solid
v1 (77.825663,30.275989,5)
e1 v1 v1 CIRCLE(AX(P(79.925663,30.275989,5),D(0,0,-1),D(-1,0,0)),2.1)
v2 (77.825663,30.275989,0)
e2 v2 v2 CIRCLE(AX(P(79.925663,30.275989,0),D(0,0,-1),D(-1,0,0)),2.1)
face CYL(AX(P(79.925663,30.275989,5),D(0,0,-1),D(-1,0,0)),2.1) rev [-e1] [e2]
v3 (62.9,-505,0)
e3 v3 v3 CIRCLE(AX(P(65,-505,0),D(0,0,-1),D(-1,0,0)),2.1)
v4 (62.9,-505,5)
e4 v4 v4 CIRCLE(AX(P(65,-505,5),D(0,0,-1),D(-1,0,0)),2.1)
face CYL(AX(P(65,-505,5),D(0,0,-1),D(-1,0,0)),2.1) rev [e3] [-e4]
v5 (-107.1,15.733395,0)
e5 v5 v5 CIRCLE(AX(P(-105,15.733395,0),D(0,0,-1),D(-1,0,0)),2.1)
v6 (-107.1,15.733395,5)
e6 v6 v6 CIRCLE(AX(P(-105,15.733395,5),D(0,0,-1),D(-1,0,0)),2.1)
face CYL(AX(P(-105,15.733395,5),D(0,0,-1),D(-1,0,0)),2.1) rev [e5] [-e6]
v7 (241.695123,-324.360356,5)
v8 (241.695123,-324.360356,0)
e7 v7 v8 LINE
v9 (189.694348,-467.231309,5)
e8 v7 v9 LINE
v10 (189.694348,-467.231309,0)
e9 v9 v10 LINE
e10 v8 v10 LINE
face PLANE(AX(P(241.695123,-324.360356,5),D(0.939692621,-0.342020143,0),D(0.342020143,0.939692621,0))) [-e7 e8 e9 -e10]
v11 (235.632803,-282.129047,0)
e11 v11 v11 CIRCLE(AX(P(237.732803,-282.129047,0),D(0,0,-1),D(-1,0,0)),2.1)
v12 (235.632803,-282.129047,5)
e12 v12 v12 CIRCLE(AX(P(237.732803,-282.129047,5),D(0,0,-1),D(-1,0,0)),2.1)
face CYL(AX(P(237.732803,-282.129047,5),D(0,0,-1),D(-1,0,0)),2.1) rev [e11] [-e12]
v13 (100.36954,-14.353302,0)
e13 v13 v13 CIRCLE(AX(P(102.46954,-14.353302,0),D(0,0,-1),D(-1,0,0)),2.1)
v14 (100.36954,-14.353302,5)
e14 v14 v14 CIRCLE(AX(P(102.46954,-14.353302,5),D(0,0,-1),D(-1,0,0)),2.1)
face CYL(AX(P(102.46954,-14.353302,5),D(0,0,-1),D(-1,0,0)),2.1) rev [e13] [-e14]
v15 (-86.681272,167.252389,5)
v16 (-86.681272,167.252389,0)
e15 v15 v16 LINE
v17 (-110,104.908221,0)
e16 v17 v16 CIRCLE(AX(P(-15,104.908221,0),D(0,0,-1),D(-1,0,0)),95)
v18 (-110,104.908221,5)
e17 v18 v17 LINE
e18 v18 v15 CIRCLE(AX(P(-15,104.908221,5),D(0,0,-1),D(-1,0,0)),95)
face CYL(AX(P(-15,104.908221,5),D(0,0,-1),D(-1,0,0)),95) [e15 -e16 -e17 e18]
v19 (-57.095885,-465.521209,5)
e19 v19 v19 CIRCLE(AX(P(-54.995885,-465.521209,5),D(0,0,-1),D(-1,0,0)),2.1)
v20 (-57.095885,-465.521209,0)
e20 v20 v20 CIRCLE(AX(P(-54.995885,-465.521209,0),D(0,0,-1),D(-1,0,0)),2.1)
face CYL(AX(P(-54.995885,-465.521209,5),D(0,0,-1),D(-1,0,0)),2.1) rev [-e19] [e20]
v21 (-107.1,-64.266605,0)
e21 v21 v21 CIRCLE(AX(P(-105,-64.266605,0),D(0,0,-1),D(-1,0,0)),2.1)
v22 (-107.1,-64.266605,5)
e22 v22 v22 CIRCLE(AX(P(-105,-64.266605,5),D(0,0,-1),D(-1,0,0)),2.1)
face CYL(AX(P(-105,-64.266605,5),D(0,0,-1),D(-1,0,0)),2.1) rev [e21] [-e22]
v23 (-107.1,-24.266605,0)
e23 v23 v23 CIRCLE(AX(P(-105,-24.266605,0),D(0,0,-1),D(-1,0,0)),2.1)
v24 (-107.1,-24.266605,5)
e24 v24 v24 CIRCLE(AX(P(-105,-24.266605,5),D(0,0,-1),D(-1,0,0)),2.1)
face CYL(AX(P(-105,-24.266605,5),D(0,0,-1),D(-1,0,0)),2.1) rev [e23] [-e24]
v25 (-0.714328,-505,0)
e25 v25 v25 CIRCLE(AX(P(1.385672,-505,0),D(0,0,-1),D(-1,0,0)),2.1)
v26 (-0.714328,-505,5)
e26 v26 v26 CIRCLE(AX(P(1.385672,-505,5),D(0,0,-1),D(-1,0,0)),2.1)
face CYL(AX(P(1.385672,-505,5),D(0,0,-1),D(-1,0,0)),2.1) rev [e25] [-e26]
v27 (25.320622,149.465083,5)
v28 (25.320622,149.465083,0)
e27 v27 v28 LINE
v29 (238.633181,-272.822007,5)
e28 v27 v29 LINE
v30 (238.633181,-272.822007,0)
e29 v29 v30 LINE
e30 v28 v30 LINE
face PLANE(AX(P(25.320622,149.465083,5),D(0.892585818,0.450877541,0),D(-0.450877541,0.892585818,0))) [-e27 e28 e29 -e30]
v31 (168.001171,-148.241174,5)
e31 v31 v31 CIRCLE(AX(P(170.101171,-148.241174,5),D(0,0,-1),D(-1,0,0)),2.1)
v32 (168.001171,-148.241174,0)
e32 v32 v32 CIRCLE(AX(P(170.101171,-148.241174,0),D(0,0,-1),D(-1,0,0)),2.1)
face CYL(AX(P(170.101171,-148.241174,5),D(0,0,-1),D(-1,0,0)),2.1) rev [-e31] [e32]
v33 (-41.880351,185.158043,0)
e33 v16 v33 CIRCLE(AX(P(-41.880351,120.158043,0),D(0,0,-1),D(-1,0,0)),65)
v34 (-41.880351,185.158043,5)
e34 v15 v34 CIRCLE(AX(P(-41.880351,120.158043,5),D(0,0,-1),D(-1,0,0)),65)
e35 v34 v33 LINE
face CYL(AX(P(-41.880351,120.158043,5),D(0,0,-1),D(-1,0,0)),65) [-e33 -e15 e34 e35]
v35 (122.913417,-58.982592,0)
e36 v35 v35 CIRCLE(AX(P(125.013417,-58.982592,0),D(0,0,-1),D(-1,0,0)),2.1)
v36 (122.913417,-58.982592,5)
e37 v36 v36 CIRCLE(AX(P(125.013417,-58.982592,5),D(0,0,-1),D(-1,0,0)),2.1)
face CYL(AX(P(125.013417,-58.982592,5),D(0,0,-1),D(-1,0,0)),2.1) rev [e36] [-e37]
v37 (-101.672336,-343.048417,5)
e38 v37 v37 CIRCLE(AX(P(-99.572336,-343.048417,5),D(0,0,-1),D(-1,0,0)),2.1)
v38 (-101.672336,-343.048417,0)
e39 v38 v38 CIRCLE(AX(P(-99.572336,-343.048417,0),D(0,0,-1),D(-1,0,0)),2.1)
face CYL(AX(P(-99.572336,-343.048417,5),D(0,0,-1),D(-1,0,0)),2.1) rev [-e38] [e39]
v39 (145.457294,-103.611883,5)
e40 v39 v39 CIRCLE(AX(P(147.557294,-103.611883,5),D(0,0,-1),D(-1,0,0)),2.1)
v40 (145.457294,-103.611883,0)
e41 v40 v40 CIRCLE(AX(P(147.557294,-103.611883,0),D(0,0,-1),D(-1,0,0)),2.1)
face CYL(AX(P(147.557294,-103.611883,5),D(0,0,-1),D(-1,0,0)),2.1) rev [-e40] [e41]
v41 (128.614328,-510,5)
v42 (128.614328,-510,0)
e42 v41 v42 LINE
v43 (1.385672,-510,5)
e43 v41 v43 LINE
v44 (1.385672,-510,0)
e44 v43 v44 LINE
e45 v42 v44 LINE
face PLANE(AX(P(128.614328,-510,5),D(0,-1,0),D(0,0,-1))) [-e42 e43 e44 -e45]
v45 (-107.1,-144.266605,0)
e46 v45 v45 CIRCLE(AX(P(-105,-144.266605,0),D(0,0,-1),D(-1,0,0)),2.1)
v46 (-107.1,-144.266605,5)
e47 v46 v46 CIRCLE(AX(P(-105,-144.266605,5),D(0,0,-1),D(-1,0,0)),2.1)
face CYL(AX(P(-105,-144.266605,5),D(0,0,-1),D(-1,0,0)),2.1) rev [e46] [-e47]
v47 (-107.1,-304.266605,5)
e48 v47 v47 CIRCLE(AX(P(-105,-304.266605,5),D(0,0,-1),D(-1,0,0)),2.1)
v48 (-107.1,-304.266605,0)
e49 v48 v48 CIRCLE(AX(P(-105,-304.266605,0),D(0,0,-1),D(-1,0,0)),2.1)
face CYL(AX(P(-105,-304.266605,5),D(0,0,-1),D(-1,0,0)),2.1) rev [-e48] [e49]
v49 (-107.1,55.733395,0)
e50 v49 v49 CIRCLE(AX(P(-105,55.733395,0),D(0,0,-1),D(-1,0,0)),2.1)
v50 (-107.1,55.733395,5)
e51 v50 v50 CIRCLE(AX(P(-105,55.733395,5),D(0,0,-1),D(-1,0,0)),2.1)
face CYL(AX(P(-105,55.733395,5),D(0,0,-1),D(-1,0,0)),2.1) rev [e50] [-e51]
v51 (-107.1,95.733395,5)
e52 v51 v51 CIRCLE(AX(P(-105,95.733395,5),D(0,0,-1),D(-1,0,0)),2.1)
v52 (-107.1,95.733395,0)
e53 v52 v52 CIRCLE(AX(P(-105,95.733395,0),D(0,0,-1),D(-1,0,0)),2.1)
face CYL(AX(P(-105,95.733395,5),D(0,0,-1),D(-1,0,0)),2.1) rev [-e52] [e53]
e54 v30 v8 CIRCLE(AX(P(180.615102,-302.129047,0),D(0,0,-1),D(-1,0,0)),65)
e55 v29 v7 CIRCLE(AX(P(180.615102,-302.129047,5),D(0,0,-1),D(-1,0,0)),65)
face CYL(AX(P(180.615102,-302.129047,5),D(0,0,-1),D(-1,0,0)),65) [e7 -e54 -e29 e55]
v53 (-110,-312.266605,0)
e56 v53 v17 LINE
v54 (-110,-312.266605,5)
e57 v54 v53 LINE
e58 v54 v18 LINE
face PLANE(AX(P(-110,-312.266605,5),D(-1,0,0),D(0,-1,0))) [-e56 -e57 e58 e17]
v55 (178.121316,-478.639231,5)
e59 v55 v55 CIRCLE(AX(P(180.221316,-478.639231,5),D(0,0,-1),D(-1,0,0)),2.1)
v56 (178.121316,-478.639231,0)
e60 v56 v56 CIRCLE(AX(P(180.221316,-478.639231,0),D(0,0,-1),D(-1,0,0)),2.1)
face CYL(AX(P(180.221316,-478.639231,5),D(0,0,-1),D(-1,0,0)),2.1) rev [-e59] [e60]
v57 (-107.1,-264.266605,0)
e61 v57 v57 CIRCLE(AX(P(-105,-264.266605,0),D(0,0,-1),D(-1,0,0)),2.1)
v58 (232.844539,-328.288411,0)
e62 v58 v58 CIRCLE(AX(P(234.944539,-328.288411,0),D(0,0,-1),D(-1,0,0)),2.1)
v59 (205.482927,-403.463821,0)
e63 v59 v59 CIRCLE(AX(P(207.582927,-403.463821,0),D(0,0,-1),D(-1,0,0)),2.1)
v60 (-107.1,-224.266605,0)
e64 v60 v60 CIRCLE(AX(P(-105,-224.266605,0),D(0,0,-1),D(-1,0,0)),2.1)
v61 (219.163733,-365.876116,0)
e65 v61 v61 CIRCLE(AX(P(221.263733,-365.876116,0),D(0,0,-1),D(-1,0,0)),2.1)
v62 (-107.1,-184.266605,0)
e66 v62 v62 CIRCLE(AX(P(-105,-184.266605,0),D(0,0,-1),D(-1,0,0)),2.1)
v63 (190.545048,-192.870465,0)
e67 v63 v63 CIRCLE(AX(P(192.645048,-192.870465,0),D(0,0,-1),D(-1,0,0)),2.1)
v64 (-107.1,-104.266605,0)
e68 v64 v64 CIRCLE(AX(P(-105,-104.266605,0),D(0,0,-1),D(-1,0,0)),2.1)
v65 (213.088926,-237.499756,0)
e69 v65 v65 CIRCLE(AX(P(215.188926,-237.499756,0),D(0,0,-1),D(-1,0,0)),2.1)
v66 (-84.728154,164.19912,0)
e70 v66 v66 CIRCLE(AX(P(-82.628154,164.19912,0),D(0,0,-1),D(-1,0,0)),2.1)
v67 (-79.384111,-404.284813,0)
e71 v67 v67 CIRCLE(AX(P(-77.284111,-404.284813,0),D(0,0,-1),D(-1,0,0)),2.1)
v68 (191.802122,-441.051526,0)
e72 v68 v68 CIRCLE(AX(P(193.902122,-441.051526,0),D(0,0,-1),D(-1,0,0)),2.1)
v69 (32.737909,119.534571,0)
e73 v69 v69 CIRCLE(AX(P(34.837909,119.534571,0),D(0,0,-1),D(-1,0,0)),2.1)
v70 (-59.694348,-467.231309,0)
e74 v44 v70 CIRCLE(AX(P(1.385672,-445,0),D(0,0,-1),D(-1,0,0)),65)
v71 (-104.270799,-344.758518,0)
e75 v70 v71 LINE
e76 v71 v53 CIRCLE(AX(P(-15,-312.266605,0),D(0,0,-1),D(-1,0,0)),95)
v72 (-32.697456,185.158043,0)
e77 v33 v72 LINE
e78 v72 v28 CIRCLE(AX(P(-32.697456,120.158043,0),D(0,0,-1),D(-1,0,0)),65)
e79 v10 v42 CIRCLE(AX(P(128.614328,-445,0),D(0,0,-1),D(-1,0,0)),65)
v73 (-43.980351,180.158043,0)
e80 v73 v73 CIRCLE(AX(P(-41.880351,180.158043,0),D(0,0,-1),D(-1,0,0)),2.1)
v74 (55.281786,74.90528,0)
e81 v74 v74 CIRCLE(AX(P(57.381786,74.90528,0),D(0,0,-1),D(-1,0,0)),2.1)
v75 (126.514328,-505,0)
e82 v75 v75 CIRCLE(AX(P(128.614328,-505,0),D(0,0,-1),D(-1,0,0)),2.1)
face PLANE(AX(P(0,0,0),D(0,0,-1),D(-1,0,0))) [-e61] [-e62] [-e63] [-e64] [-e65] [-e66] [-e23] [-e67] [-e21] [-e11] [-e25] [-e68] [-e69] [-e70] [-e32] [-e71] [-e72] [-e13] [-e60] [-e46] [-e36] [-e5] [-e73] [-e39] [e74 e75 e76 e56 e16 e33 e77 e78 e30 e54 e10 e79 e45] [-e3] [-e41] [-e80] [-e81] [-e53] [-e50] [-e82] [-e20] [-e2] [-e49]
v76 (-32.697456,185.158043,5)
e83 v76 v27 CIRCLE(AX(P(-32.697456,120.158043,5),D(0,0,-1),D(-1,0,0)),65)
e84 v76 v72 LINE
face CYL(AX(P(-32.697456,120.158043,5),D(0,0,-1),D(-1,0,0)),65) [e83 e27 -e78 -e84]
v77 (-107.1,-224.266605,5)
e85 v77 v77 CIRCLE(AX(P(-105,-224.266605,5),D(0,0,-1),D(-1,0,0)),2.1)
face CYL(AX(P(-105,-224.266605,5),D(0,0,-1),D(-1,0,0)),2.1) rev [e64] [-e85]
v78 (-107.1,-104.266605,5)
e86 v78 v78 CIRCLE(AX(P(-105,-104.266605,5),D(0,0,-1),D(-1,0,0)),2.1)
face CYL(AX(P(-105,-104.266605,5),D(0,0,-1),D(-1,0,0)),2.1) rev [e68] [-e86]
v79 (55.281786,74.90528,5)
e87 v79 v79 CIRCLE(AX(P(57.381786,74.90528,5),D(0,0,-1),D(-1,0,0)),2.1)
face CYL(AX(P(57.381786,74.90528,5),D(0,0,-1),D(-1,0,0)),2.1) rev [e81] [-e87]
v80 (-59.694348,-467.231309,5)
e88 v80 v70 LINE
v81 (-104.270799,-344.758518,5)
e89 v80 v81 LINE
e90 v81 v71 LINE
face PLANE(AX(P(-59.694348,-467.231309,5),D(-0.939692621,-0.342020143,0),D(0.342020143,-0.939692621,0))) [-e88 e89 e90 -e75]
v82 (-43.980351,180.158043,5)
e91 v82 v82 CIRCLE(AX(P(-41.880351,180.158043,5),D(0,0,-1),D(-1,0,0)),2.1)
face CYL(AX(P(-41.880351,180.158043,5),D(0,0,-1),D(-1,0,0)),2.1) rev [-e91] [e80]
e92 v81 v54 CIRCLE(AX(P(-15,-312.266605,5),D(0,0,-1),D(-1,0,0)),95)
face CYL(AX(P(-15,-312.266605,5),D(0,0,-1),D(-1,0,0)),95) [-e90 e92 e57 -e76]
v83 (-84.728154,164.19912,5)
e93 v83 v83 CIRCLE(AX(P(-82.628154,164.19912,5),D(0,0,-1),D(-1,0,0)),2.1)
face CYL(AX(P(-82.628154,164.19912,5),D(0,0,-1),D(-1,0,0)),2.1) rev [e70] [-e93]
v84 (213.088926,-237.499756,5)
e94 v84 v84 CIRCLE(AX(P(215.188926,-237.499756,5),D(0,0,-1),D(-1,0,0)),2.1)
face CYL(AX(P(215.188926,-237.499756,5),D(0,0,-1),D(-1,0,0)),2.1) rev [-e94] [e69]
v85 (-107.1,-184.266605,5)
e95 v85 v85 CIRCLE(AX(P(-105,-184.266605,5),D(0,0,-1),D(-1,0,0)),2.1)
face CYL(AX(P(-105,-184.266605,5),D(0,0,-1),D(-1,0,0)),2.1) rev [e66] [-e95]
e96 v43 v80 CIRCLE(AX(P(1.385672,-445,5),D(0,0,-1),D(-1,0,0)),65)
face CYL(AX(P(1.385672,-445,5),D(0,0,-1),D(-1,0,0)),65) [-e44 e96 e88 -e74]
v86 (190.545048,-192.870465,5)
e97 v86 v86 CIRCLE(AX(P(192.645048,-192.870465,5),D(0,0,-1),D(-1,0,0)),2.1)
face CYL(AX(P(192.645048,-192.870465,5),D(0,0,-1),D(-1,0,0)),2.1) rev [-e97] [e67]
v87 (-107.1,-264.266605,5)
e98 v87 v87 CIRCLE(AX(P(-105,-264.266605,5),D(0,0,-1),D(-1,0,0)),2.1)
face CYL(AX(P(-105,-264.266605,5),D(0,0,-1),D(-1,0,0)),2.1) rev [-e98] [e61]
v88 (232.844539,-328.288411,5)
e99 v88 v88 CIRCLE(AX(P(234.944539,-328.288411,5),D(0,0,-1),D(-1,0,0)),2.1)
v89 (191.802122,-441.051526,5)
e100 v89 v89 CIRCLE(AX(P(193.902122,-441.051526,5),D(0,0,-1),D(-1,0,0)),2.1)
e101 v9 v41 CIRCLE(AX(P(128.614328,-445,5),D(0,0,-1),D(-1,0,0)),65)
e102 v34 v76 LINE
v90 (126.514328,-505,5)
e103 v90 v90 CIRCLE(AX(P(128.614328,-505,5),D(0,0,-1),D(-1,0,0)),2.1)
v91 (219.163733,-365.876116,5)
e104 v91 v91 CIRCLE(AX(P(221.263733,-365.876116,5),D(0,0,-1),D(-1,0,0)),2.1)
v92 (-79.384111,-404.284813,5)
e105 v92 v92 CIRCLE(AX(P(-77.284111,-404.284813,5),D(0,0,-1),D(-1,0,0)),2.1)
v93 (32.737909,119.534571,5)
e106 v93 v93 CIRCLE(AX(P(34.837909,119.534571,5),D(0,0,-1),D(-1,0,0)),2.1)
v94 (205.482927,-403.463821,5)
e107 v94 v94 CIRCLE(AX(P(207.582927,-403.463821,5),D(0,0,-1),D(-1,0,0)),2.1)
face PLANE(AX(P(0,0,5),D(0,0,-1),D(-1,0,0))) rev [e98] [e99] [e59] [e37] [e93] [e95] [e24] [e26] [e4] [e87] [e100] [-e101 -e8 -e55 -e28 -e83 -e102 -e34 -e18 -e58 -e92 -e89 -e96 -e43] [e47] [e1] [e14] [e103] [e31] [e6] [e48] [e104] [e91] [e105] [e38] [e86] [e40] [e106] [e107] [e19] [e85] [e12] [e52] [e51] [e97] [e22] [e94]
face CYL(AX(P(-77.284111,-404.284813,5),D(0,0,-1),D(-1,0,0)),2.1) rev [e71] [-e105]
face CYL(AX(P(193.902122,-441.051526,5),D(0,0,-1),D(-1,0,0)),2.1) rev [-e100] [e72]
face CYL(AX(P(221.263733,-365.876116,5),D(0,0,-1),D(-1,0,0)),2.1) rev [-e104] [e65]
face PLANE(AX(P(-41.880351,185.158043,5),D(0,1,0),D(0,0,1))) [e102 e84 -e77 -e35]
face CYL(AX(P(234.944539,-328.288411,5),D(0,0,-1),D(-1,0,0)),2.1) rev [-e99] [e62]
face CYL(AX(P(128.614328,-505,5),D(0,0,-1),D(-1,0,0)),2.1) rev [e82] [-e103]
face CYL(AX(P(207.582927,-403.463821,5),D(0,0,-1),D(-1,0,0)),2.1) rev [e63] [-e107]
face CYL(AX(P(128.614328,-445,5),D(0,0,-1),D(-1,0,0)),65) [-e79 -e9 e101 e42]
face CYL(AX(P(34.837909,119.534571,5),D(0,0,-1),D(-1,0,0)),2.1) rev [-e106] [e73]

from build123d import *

# Parameters (mm, degrees)
SKETCH1_W           = 720
SKETCH1_H           = 1160
BOSS_EXTRUDE1_DEPTH = 5
FILLET1_R           = 10
CUT_EXTRUDE1_DEPTH  = 683.6602376
SKETCH3_W           = 360
SKETCH3_H           = 360
CUT_EXTRUDE2_DEPTH  = 683.6602376
FILLET2_R           = 100
BOSS_EXTRUDE2_DEPTH = 5
FILLET3_R           = 10
CUT_EXTRUDE5_DEPTH  = 691.712208801
FILLET6_R           = 50
FILLET7_R           = 50
BOSS_EXTRUDE3_DEPTH = 5
SKETCH10_W          = 50
SKETCH10_H          = 680
BOSS_EXTRUDE4_DEPTH = 5
BOSS_EXTRUDE5_DEPTH = 5
FILLET8_R           = 20
FILLET9_R           = 100
FILLET10_R          = 10
SKETCH12_R          = 2.1
CUT_EXTRUDE6_DEPTH  = 691.71220894
FILLET11_R          = 80
SKETCH13_R          = 3.1
CUT_EXTRUDE7_DEPTH  = 691.71220894
SKETCH14_R          = 2.1
CUT_EXTRUDE8_DEPTH  = 691.71220894
SKETCH15_R          = 2.1
CUT_EXTRUDE9_DEPTH  = 691.71220894
SKETCH16_R          = 2.1
CUT_EXTRUDE10_DEPTH = 691.71220894
SKETCH17_R          = 3.1
CUT_EXTRUDE11_DEPTH = 691.71220894
SKETCH18_R          = 2.1
CUT_EXTRUDE12_DEPTH = 691.71220894
CUT_EXTRUDE13_DEPTH = 691.71220894
BOSS_EXTRUDE6_START = -5
BOSS_EXTRUDE6_DEPTH = 5


with BuildPart() as part:
    # Sketch1 → Boss-Extrude1 (new body)
    with BuildSketch(Plane.XY):
        Rectangle(SKETCH1_W, SKETCH1_H)
    extrude(amount=BOSS_EXTRUDE1_DEPTH)

    # Fillet1
    fillet1_edges = [part.edges().sort_by_distance(p)[0] for p in [
        (360, -580, 2.5),
        (-360, -580, 2.5),
        (-360, 580, 2.5),
        (360, 580, 2.5),
    ]]
    fillet(fillet1_edges, radius=FILLET1_R)

    # Sketch2 → Cut-Extrude1 (cut, through all)
    with BuildSketch(Plane(origin=(0, 0, 0), x_dir=(-1, 0, 0), z_dir=(0, 0, -1))):
        Polygon((-360, -400), (110, 580), (-360, 580), align=None)
    extrude(amount=-CUT_EXTRUDE1_DEPTH, mode=Mode.SUBTRACT)

    # Sketch3 → Cut-Extrude2 (cut, through all)
    with BuildSketch(Plane.XY.offset(5)):
        with Locations((-360, 300)):
            Rectangle(SKETCH3_W, SKETCH3_H)
    extrude(amount=-CUT_EXTRUDE2_DEPTH, mode=Mode.SUBTRACT)

    # Fillet2
    fillet2_edges = [part.edges().sort_by_distance(p)[0] for p in [
        (-180, 120, 2.5),
        (-180, 480, 2.5),
    ]]
    fillet(fillet2_edges, radius=FILLET2_R)

    # Sketch4 → Boss-Extrude2 (add)
    with BuildSketch(Plane(origin=(0, 0, 0), x_dir=(-1, 0, 0), z_dir=(0, 0, -1))):
        Polygon((-360, -400), (-381.299239221, -400), (39.887910056, 433.808833734), align=None)
    extrude(amount=-BOSS_EXTRUDE2_DEPTH)

    # Fillet3
    fillet3_edges = [part.edges().sort_by_distance(p)[0] for p in [
        (381.299239221, -400, 2.5),
    ]]
    fillet(fillet3_edges, radius=FILLET3_R)

    # Sketch8 → Cut-Extrude5 (cut, through all)
    with BuildSketch(Plane(origin=(0, 0, 0), x_dir=(-1, 0, 0), z_dir=(0, 0, -1))):
        Polygon((-157.260531971, -145), (-235, -298.897988777), (-163.624705035, -495), (-65, -495), (-65, -145), align=None)
        Polygon((221.746403662, 21.860119087), (105, -298.897988777), (27.260531971, -145), (-157.260531971, -145), (1.937250728, 170.158042579), (61.462906267, 170.158042579), align=None)
        Polygon((27.260531971, -145), (-65, -145), (-65, -495), (33.624705035, -495), (105, -298.897988777), align=None)
    extrude(amount=-CUT_EXTRUDE5_DEPTH, mode=Mode.SUBTRACT)

    # Fillet6
    fillet6_edges = [part.edges().sort_by_distance(p)[0] for p in [
        (-221.746403662, 21.860119087, 2.5),
        (-33.624705035, -495, 2.5),
        (163.624705035, -495, 2.5),
        (235, -298.897988777, 2.5),
        (-61.462906267, 170.158042579, 2.5),
    ]]
    fillet(fillet6_edges, radius=FILLET6_R)

    # Fillet7
    fillet7_edges = [part.edges().sort_by_distance(p)[0] for p in [
        (-1.937250728, 170.158042579, 2.5),
    ]]
    fillet(fillet7_edges, radius=FILLET7_R)

    # Sketch9 → Boss-Extrude3 (add)
    with BuildSketch(Plane(origin=(0, 0, 0), x_dir=(-1, 0, 0), z_dir=(0, 0, -1))):
        Polygon((130, 100), (110, 100), (110, -285.160601679), (130, -230.21105329), align=None)
        Polygon((110, 120), (110, 100), (130, 100), (137.291186057, 100), (115.674767753, 120), align=None)
    extrude(amount=-BOSS_EXTRUDE3_DEPTH)

    # Sketch10 → Boss-Extrude4 (add)
    with BuildSketch(Plane(origin=(0, 0, 0), x_dir=(-1, 0, 0), z_dir=(0, 0, -1))):
        with Locations((120, -65.105526645)):
            Rectangle(SKETCH10_W, SKETCH10_H)
    extrude(amount=-BOSS_EXTRUDE4_DEPTH)

    # Sketch11 → Boss-Extrude5 (add)
    with BuildSketch(Plane(origin=(0, 0, 0), x_dir=(-1, 0, 0), z_dir=(0, 0, -1))):
        Polygon((145, 10.590837072), (187.73624833, 53.327085402), (145, 92.867630674), align=None)
    extrude(amount=-BOSS_EXTRUDE5_DEPTH)

    # Fillet8
    fillet8_edges = [part.edges().sort_by_distance(p)[0] for p in [
        (-187.73624833, 53.327085402, 2.5),
    ]]
    fillet(fillet8_edges, radius=FILLET8_R)

    # Fillet9
    # the kernel refuses this fillet: 100 mm, written as the material it adds along each edge
    with BuildSketch(Plane(origin=(-145, 10.590837072, 0), x_dir=(-0.7071067811865508, 0.7071067811865444, 0), z_dir=(0, 0, 1))) as fillet9_piece_1:
        with BuildLine():
            CenterArc((41.425014476, 99.996341761), FILLET9_R, 225, 44.509910946)
            Line((-29.285663642, 29.285663642), (-30.699877205, 27.87145008))
            Line((-30.699877205, 27.87145008), (-1.414213562, -1.414213562))
            Line((-1.414213562, -1.414213562), (0, -2))
            Line((0, -2), (40.552551018, -1.999926835))
            Line((40.552551018, -1.999926835), (40.569658144, 0))
        make_face()
    extrude(amount=5)

    # Fillet10
    fillet10_edges = [part.edges().sort_by_distance(p)[0] for p in [
        (-145, -188.998891999, 2.5),
    ]]
    fillet(fillet10_edges, radius=FILLET10_R)

    # Sketch12 → Cut-Extrude6 (cut, through all)
    with BuildSketch(Plane(origin=(0, 0, 0), x_dir=(-1, 0, 0), z_dir=(0, 0, -1))):
        with Locations((-237.732802544, -282.129047053)):
            Circle(SKETCH12_R)
        with Locations((-215.18892551, -237.49975613)):
            Circle(SKETCH12_R)
        with Locations((-192.645048475, -192.870465208)):
            Circle(SKETCH12_R)
        with Locations((-170.101171441, -148.241174285)):
            Circle(SKETCH12_R)
        with Locations((-147.557294406, -103.611883362)):
            Circle(SKETCH12_R)
        with Locations((-125.013417372, -58.98259244)):
            Circle(SKETCH12_R)
        with Locations((-102.469540337, -14.353301517)):
            Circle(SKETCH12_R)
        with Locations((-79.925663303, 30.275989405)):
            Circle(SKETCH12_R)
        with Locations((-57.381786268, 74.905280328)):
            Circle(SKETCH12_R)
        with Locations((-34.837909234, 119.534571251)):
            Circle(SKETCH12_R)
    extrude(amount=-CUT_EXTRUDE6_DEPTH, mode=Mode.SUBTRACT)

    # Fillet11
    # the kernel refuses this fillet: 80 mm, written as the material it adds along each edge
    with BuildSketch(Plane(origin=(-95, -326.372762971, 5), x_dir=(0.34202014332567043, -0.9396926207859078, 0), z_dir=(0, 0, -1))) as fillet11_piece_1:
        with BuildLine():
            CenterArc((FILLET11_R * 0.176326980708, -FILLET11_R), FILLET11_R, 90, 20)
            Line((-FILLET11_R * 0.165693162617, -FILLET11_R * 0.0603073792141), (0, 0))
            Line((0, 0), (FILLET11_R * 0.176326980708, 0))
        make_face()
    extrude(amount=5)
    with BuildSketch(Plane(origin=(-95, 139.128763573, 0), x_dir=(0, -1, 0), z_dir=(0, 0, 1))) as fillet11_piece_2:
        with BuildLine():
            CenterArc((34.220542128, 80), FILLET11_R, 229.504826403, 40.495173597)
            Line((-17.730177232, 19.163146383), (0, 0))
            Line((0, 0), (34.220542128, 0))
        make_face()
    extrude(amount=5)

    # Sketch13 → Cut-Extrude7 (cut, through all)
    with BuildSketch(Plane(origin=(0, 0, 0), x_dir=(-1, 0, 0), z_dir=(0, 0, -1))):
        with Locations((-295.119528739, -258.298431639)):
            Circle(SKETCH13_R)
        with Locations((-326.902073438, -318.41390263)):
            Circle(SKETCH13_R)
    extrude(amount=-CUT_EXTRUDE7_DEPTH, mode=Mode.SUBTRACT)

    # Sketch14 → Cut-Extrude8 (cut, through all)
    with BuildSketch(Plane.XY.offset(5)):
        with Locations((-340, 110)):
            Circle(SKETCH14_R)
        with Locations((-300, 110)):
            Circle(SKETCH14_R)
        with Locations((-260, 110)):
            Circle(SKETCH14_R)
        with Locations((-220, 110)):
            Circle(SKETCH14_R)
        with Locations((-180, 110)):
            Circle(SKETCH14_R)
        with Locations((-140, 110)):
            Circle(SKETCH14_R)
    extrude(amount=-CUT_EXTRUDE8_DEPTH, mode=Mode.SUBTRACT)

    # Sketch15 → Cut-Extrude9 (cut, through all)
    with BuildSketch(Plane.XY.offset(5)):
        with Locations((-350, -570)):
            Circle(SKETCH15_R)
        with Locations((-350, -530)):
            Circle(SKETCH15_R)
        with Locations((-350, -490)):
            Circle(SKETCH15_R)
        with Locations((-350, -450)):
            Circle(SKETCH15_R)
        with Locations((-350, -410)):
            Circle(SKETCH15_R)
        with Locations((-350, -370)):
            Circle(SKETCH15_R)
        with Locations((-350, -330)):
            Circle(SKETCH15_R)
        with Locations((-350, -290)):
            Circle(SKETCH15_R)
        with Locations((-350, -250)):
            Circle(SKETCH15_R)
        with Locations((-350, -210)):
            Circle(SKETCH15_R)
        with Locations((-350, -170)):
            Circle(SKETCH15_R)
        with Locations((-350, -130)):
            Circle(SKETCH15_R)
        with Locations((-350, -90)):
            Circle(SKETCH15_R)
        with Locations((-350, -50)):
            Circle(SKETCH15_R)
        with Locations((-350, -10)):
            Circle(SKETCH15_R)
        with Locations((-350, 30)):
            Circle(SKETCH15_R)
        with Locations((-350, 70)):
            Circle(SKETCH15_R)
        with Locations((-350, 110)):
            Circle(SKETCH15_R)
        with Locations((-120, -570)):
            Circle(SKETCH15_R)
        with Locations((-120, -530)):
            Circle(SKETCH15_R)
        with Locations((-120, -490)):
            Circle(SKETCH15_R)
        with Locations((-120, -450)):
            Circle(SKETCH15_R)
        with Locations((-120, -410)):
            Circle(SKETCH15_R)
        with Locations((-120, -370)):
            Circle(SKETCH15_R)
        with Locations((-120, -330)):
            Circle(SKETCH15_R)
        with Locations((-120, -290)):
            Circle(SKETCH15_R)
        with Locations((-120, -250)):
            Circle(SKETCH15_R)
        with Locations((-120, -210)):
            Circle(SKETCH15_R)
        with Locations((-120, -170)):
            Circle(SKETCH15_R)
        with Locations((-120, -130)):
            Circle(SKETCH15_R)
        with Locations((-120, -90)):
            Circle(SKETCH15_R)
        with Locations((-120, -50)):
            Circle(SKETCH15_R)
        with Locations((-120, -10)):
            Circle(SKETCH15_R)
        with Locations((-120, 30)):
            Circle(SKETCH15_R)
        with Locations((-120, 70)):
            Circle(SKETCH15_R)
        with Locations((-120, 110)):
            Circle(SKETCH15_R)
    extrude(amount=-CUT_EXTRUDE9_DEPTH, mode=Mode.SUBTRACT)

    # Sketch16 → Cut-Extrude10 (cut, through all)
    with BuildSketch(Plane.XY.offset(5)):
        with Locations((-315, -570)):
            Circle(SKETCH16_R)
        with Locations((-280, -570)):
            Circle(SKETCH16_R)
        with Locations((-245, -570)):
            Circle(SKETCH16_R)
        with Locations((-210, -570)):
            Circle(SKETCH16_R)
        with Locations((-175, -570)):
            Circle(SKETCH16_R)
        with Locations((-140, -570)):
            Circle(SKETCH16_R)
        with Locations((-105, -570)):
            Circle(SKETCH16_R)
        with Locations((-70, -570)):
            Circle(SKETCH16_R)
        with Locations((-35, -570)):
            Circle(SKETCH16_R)
        with Locations((0, -570)):
            Circle(SKETCH16_R)
        with Locations((35, -570)):
            Circle(SKETCH16_R)
        with Locations((70, -570)):
            Circle(SKETCH16_R)
        with Locations((105, -570)):
            Circle(SKETCH16_R)
        with Locations((140, -570)):
            Circle(SKETCH16_R)
        with Locations((175, -570)):
            Circle(SKETCH16_R)
        with Locations((210, -570)):
            Circle(SKETCH16_R)
        with Locations((245, -570)):
            Circle(SKETCH16_R)
        with Locations((280, -570)):
            Circle(SKETCH16_R)
        with Locations((315, -570)):
            Circle(SKETCH16_R)
        with Locations((350, -570)):
            Circle(SKETCH16_R)
    extrude(amount=-CUT_EXTRUDE10_DEPTH, mode=Mode.SUBTRACT)

    # Sketch17 → Cut-Extrude11 (cut, through all)
    with BuildSketch(Plane(origin=(0, 0, 0), x_dir=(-1, 0, 0), z_dir=(0, 0, -1))):
        with Locations((-335, -410)):
            Circle(SKETCH17_R)
        with Locations((-335, -450)):
            Circle(SKETCH17_R)
        with Locations((-335, -490)):
            Circle(SKETCH17_R)
        with Locations((-335, -530)):
            Circle(SKETCH17_R)
    extrude(amount=-CUT_EXTRUDE11_DEPTH, mode=Mode.SUBTRACT)

    # Sketch18 → Cut-Extrude12 (cut, through all)
    with BuildSketch(Plane(origin=(0, 0, 0), x_dir=(-1, 0, 0), z_dir=(0, 0, -1))):
        with Locations((-234.944538726, -328.288411377)):
            Circle(SKETCH18_R)
        with Locations((-221.263732993, -365.876116209)):
            Circle(SKETCH18_R)
        with Locations((-207.58292726, -403.46382104)):
            Circle(SKETCH18_R)
        with Locations((-193.902121527, -441.051525871)):
            Circle(SKETCH18_R)
        with Locations((-180.221315794, -478.639230703)):
            Circle(SKETCH18_R)
        with Locations((-128.614328125, -505)):
            Circle(SKETCH18_R)
        with Locations((-65, -505)):
            Circle(SKETCH18_R)
        with Locations((-1.385671875, -505)):
            Circle(SKETCH18_R)
        with Locations((54.995885372, -465.5212086)):
            Circle(SKETCH18_R)
        with Locations((77.284110621, -404.284813007)):
            Circle(SKETCH18_R)
        with Locations((99.572335871, -343.048417414)):
            Circle(SKETCH18_R)
        with Locations((105, -304.266604515)):
            Circle(SKETCH18_R)
        with Locations((105, -264.266604515)):
            Circle(SKETCH18_R)
        with Locations((105, -224.266604515)):
            Circle(SKETCH18_R)
        with Locations((105, -184.266604515)):
            Circle(SKETCH18_R)
        with Locations((105, -144.266604515)):
            Circle(SKETCH18_R)
        with Locations((105, -104.266604515)):
            Circle(SKETCH18_R)
        with Locations((105, -64.266604515)):
            Circle(SKETCH18_R)
        with Locations((105, -24.266604515)):
            Circle(SKETCH18_R)
        with Locations((105, 15.733395485)):
            Circle(SKETCH18_R)
        with Locations((105, 55.733395485)):
            Circle(SKETCH18_R)
        with Locations((105, 95.733395485)):
            Circle(SKETCH18_R)
        with Locations((41.880351009, 180.158042579)):
            Circle(SKETCH18_R)
        with Locations((82.628154139, 164.199120451)):
            Circle(SKETCH18_R)
    extrude(amount=-CUT_EXTRUDE12_DEPTH, mode=Mode.SUBTRACT)

    # Sketch19 → Cut-Extrude13 (cut, through all)
    with BuildSketch(Plane(origin=(0, 0, 0), x_dir=(-1, 0, 0), z_dir=(0, 0, -1))):
        with BuildLine():
            Line((39.887910056, 433.808833734), (-373.970329397, -385.491224593))
            ThreePointArc((-373.970329397, -385.491224593), (-373.561740554, -395.23985906), (-365.044471212, -400))
            Line((-365.044471212, -400), (-360, -400))
            Line((-360, -400), (-360, -570))
            ThreePointArc((-360, -570), (-357.071067812, -577.071067812), (-350, -580))
            Line((-350, -580), (350, -580))
            ThreePointArc((350, -580), (357.071067812, -577.071067812), (360, -570))
            Line((360, -570), (360, 120))
            Line((360, 120), (280, 120))
            ThreePointArc((280, 120), (209.289321881, 149.289321881), (180, 220))
            Line((180, 220), (180, 380))
            ThreePointArc((180, 380), (209.289321881, 450.710678119), (280, 480))
            Line((280, 480), (360, 480))
            Line((360, 480), (360, 570))
            ThreePointArc((360, 570), (357.071067812, 577.071067812), (350, 580))
            Line((350, 580), (110, 580))
            Line((110, 580), (39.887910056, 433.808833734))
        make_face()
        with BuildLine():
            Line((-241.69512269, -324.360356369), (-189.694348476, -467.231309316))
            ThreePointArc((-189.694348476, -467.231309316), (-165.896796487, -498.244882879), (-128.614328125, -510))
            Line((-128.614328125, -510), (-1.385671875, -510))
            ThreePointArc((-1.385671875, -510), (35.896796487, -498.244882879), (59.694348476, -467.231309316))
            Line((59.694348476, -467.231309316), (104.270798975, -344.758518131))
            ThreePointArc((104.270798975, -344.758518131), (108.556736536, -328.763181393), (110, -312.266604515))
            Line((110, -312.266604515), (110, 104.908221446))
            ThreePointArc((110, 104.908221446), (103.979550556, 138.189441117), (86.681271941, 167.2523892))
            ThreePointArc((86.681271941, 167.2523892), (66.003653743, 180.515861171), (41.880351009, 185.158042579))
            Line((41.880351009, 185.158042579), (32.697455963, 185.158042579))
            ThreePointArc((32.697455963, 185.158042579), (-1.361627925, 175.520293298), (-25.320622236, 149.465082723))
            Line((-25.320622236, 149.465082723), (-238.633180538, -272.822006908))
            ThreePointArc((-238.633180538, -272.822006908), (-245.500691154, -298.27413277), (-241.69512269, -324.360356369))
        make_face(mode=Mode.SUBTRACT)
    extrude(amount=-CUT_EXTRUDE13_DEPTH, mode=Mode.SUBTRACT)

    # Sketch20 → Boss-Extrude6 (add)
    with BuildSketch(Plane(origin=(0, 0, 0), x_dir=(-1, 0, 0), z_dir=(0, 0, -1)).offset(BOSS_EXTRUDE6_START)):
        with BuildLine():
            Line((95, 104.908221446), (95, -312.266604515))
            ThreePointArc((95, -312.266604515), (93.784620241, -326.158458728), (90.175409663, -339.628215981))
            Line((90.175409663, -339.628215981), (45.598959164, -462.101007166))
            ThreePointArc((45.598959164, -462.101007166), (27.293149942, -485.957602214), (-1.385671875, -495))
            Line((-1.385671875, -495), (-128.614328125, -495))
            ThreePointArc((-128.614328125, -495), (-157.293149942, -485.957602214), (-175.598959164, -462.101007166))
            Line((-175.598959164, -462.101007166), (-227.599733378, -319.230054219))
            ThreePointArc((-227.599733378, -319.230054219), (-230.527093735, -299.163728374), (-225.244393261, -279.585170018))
            Line((-225.244393261, -279.585170018), (-11.931834959, 142.701919613))
            ThreePointArc((-11.931834959, 142.701919613), (6.498160665, 162.744389286), (32.697455963, 170.158042579))
            Line((32.697455963, 170.158042579), (41.880351009, 170.158042579))
            ThreePointArc((41.880351009, 170.158042579), (60.114317784, 166.714701132), (75.836853617, 156.858940805))
            ThreePointArc((75.836853617, 156.858940805), (90.056473037, 132.594424785), (95, 104.908221446))
        make_face()
    extrude(amount=BOSS_EXTRUDE6_DEPTH)


solid = part.part
